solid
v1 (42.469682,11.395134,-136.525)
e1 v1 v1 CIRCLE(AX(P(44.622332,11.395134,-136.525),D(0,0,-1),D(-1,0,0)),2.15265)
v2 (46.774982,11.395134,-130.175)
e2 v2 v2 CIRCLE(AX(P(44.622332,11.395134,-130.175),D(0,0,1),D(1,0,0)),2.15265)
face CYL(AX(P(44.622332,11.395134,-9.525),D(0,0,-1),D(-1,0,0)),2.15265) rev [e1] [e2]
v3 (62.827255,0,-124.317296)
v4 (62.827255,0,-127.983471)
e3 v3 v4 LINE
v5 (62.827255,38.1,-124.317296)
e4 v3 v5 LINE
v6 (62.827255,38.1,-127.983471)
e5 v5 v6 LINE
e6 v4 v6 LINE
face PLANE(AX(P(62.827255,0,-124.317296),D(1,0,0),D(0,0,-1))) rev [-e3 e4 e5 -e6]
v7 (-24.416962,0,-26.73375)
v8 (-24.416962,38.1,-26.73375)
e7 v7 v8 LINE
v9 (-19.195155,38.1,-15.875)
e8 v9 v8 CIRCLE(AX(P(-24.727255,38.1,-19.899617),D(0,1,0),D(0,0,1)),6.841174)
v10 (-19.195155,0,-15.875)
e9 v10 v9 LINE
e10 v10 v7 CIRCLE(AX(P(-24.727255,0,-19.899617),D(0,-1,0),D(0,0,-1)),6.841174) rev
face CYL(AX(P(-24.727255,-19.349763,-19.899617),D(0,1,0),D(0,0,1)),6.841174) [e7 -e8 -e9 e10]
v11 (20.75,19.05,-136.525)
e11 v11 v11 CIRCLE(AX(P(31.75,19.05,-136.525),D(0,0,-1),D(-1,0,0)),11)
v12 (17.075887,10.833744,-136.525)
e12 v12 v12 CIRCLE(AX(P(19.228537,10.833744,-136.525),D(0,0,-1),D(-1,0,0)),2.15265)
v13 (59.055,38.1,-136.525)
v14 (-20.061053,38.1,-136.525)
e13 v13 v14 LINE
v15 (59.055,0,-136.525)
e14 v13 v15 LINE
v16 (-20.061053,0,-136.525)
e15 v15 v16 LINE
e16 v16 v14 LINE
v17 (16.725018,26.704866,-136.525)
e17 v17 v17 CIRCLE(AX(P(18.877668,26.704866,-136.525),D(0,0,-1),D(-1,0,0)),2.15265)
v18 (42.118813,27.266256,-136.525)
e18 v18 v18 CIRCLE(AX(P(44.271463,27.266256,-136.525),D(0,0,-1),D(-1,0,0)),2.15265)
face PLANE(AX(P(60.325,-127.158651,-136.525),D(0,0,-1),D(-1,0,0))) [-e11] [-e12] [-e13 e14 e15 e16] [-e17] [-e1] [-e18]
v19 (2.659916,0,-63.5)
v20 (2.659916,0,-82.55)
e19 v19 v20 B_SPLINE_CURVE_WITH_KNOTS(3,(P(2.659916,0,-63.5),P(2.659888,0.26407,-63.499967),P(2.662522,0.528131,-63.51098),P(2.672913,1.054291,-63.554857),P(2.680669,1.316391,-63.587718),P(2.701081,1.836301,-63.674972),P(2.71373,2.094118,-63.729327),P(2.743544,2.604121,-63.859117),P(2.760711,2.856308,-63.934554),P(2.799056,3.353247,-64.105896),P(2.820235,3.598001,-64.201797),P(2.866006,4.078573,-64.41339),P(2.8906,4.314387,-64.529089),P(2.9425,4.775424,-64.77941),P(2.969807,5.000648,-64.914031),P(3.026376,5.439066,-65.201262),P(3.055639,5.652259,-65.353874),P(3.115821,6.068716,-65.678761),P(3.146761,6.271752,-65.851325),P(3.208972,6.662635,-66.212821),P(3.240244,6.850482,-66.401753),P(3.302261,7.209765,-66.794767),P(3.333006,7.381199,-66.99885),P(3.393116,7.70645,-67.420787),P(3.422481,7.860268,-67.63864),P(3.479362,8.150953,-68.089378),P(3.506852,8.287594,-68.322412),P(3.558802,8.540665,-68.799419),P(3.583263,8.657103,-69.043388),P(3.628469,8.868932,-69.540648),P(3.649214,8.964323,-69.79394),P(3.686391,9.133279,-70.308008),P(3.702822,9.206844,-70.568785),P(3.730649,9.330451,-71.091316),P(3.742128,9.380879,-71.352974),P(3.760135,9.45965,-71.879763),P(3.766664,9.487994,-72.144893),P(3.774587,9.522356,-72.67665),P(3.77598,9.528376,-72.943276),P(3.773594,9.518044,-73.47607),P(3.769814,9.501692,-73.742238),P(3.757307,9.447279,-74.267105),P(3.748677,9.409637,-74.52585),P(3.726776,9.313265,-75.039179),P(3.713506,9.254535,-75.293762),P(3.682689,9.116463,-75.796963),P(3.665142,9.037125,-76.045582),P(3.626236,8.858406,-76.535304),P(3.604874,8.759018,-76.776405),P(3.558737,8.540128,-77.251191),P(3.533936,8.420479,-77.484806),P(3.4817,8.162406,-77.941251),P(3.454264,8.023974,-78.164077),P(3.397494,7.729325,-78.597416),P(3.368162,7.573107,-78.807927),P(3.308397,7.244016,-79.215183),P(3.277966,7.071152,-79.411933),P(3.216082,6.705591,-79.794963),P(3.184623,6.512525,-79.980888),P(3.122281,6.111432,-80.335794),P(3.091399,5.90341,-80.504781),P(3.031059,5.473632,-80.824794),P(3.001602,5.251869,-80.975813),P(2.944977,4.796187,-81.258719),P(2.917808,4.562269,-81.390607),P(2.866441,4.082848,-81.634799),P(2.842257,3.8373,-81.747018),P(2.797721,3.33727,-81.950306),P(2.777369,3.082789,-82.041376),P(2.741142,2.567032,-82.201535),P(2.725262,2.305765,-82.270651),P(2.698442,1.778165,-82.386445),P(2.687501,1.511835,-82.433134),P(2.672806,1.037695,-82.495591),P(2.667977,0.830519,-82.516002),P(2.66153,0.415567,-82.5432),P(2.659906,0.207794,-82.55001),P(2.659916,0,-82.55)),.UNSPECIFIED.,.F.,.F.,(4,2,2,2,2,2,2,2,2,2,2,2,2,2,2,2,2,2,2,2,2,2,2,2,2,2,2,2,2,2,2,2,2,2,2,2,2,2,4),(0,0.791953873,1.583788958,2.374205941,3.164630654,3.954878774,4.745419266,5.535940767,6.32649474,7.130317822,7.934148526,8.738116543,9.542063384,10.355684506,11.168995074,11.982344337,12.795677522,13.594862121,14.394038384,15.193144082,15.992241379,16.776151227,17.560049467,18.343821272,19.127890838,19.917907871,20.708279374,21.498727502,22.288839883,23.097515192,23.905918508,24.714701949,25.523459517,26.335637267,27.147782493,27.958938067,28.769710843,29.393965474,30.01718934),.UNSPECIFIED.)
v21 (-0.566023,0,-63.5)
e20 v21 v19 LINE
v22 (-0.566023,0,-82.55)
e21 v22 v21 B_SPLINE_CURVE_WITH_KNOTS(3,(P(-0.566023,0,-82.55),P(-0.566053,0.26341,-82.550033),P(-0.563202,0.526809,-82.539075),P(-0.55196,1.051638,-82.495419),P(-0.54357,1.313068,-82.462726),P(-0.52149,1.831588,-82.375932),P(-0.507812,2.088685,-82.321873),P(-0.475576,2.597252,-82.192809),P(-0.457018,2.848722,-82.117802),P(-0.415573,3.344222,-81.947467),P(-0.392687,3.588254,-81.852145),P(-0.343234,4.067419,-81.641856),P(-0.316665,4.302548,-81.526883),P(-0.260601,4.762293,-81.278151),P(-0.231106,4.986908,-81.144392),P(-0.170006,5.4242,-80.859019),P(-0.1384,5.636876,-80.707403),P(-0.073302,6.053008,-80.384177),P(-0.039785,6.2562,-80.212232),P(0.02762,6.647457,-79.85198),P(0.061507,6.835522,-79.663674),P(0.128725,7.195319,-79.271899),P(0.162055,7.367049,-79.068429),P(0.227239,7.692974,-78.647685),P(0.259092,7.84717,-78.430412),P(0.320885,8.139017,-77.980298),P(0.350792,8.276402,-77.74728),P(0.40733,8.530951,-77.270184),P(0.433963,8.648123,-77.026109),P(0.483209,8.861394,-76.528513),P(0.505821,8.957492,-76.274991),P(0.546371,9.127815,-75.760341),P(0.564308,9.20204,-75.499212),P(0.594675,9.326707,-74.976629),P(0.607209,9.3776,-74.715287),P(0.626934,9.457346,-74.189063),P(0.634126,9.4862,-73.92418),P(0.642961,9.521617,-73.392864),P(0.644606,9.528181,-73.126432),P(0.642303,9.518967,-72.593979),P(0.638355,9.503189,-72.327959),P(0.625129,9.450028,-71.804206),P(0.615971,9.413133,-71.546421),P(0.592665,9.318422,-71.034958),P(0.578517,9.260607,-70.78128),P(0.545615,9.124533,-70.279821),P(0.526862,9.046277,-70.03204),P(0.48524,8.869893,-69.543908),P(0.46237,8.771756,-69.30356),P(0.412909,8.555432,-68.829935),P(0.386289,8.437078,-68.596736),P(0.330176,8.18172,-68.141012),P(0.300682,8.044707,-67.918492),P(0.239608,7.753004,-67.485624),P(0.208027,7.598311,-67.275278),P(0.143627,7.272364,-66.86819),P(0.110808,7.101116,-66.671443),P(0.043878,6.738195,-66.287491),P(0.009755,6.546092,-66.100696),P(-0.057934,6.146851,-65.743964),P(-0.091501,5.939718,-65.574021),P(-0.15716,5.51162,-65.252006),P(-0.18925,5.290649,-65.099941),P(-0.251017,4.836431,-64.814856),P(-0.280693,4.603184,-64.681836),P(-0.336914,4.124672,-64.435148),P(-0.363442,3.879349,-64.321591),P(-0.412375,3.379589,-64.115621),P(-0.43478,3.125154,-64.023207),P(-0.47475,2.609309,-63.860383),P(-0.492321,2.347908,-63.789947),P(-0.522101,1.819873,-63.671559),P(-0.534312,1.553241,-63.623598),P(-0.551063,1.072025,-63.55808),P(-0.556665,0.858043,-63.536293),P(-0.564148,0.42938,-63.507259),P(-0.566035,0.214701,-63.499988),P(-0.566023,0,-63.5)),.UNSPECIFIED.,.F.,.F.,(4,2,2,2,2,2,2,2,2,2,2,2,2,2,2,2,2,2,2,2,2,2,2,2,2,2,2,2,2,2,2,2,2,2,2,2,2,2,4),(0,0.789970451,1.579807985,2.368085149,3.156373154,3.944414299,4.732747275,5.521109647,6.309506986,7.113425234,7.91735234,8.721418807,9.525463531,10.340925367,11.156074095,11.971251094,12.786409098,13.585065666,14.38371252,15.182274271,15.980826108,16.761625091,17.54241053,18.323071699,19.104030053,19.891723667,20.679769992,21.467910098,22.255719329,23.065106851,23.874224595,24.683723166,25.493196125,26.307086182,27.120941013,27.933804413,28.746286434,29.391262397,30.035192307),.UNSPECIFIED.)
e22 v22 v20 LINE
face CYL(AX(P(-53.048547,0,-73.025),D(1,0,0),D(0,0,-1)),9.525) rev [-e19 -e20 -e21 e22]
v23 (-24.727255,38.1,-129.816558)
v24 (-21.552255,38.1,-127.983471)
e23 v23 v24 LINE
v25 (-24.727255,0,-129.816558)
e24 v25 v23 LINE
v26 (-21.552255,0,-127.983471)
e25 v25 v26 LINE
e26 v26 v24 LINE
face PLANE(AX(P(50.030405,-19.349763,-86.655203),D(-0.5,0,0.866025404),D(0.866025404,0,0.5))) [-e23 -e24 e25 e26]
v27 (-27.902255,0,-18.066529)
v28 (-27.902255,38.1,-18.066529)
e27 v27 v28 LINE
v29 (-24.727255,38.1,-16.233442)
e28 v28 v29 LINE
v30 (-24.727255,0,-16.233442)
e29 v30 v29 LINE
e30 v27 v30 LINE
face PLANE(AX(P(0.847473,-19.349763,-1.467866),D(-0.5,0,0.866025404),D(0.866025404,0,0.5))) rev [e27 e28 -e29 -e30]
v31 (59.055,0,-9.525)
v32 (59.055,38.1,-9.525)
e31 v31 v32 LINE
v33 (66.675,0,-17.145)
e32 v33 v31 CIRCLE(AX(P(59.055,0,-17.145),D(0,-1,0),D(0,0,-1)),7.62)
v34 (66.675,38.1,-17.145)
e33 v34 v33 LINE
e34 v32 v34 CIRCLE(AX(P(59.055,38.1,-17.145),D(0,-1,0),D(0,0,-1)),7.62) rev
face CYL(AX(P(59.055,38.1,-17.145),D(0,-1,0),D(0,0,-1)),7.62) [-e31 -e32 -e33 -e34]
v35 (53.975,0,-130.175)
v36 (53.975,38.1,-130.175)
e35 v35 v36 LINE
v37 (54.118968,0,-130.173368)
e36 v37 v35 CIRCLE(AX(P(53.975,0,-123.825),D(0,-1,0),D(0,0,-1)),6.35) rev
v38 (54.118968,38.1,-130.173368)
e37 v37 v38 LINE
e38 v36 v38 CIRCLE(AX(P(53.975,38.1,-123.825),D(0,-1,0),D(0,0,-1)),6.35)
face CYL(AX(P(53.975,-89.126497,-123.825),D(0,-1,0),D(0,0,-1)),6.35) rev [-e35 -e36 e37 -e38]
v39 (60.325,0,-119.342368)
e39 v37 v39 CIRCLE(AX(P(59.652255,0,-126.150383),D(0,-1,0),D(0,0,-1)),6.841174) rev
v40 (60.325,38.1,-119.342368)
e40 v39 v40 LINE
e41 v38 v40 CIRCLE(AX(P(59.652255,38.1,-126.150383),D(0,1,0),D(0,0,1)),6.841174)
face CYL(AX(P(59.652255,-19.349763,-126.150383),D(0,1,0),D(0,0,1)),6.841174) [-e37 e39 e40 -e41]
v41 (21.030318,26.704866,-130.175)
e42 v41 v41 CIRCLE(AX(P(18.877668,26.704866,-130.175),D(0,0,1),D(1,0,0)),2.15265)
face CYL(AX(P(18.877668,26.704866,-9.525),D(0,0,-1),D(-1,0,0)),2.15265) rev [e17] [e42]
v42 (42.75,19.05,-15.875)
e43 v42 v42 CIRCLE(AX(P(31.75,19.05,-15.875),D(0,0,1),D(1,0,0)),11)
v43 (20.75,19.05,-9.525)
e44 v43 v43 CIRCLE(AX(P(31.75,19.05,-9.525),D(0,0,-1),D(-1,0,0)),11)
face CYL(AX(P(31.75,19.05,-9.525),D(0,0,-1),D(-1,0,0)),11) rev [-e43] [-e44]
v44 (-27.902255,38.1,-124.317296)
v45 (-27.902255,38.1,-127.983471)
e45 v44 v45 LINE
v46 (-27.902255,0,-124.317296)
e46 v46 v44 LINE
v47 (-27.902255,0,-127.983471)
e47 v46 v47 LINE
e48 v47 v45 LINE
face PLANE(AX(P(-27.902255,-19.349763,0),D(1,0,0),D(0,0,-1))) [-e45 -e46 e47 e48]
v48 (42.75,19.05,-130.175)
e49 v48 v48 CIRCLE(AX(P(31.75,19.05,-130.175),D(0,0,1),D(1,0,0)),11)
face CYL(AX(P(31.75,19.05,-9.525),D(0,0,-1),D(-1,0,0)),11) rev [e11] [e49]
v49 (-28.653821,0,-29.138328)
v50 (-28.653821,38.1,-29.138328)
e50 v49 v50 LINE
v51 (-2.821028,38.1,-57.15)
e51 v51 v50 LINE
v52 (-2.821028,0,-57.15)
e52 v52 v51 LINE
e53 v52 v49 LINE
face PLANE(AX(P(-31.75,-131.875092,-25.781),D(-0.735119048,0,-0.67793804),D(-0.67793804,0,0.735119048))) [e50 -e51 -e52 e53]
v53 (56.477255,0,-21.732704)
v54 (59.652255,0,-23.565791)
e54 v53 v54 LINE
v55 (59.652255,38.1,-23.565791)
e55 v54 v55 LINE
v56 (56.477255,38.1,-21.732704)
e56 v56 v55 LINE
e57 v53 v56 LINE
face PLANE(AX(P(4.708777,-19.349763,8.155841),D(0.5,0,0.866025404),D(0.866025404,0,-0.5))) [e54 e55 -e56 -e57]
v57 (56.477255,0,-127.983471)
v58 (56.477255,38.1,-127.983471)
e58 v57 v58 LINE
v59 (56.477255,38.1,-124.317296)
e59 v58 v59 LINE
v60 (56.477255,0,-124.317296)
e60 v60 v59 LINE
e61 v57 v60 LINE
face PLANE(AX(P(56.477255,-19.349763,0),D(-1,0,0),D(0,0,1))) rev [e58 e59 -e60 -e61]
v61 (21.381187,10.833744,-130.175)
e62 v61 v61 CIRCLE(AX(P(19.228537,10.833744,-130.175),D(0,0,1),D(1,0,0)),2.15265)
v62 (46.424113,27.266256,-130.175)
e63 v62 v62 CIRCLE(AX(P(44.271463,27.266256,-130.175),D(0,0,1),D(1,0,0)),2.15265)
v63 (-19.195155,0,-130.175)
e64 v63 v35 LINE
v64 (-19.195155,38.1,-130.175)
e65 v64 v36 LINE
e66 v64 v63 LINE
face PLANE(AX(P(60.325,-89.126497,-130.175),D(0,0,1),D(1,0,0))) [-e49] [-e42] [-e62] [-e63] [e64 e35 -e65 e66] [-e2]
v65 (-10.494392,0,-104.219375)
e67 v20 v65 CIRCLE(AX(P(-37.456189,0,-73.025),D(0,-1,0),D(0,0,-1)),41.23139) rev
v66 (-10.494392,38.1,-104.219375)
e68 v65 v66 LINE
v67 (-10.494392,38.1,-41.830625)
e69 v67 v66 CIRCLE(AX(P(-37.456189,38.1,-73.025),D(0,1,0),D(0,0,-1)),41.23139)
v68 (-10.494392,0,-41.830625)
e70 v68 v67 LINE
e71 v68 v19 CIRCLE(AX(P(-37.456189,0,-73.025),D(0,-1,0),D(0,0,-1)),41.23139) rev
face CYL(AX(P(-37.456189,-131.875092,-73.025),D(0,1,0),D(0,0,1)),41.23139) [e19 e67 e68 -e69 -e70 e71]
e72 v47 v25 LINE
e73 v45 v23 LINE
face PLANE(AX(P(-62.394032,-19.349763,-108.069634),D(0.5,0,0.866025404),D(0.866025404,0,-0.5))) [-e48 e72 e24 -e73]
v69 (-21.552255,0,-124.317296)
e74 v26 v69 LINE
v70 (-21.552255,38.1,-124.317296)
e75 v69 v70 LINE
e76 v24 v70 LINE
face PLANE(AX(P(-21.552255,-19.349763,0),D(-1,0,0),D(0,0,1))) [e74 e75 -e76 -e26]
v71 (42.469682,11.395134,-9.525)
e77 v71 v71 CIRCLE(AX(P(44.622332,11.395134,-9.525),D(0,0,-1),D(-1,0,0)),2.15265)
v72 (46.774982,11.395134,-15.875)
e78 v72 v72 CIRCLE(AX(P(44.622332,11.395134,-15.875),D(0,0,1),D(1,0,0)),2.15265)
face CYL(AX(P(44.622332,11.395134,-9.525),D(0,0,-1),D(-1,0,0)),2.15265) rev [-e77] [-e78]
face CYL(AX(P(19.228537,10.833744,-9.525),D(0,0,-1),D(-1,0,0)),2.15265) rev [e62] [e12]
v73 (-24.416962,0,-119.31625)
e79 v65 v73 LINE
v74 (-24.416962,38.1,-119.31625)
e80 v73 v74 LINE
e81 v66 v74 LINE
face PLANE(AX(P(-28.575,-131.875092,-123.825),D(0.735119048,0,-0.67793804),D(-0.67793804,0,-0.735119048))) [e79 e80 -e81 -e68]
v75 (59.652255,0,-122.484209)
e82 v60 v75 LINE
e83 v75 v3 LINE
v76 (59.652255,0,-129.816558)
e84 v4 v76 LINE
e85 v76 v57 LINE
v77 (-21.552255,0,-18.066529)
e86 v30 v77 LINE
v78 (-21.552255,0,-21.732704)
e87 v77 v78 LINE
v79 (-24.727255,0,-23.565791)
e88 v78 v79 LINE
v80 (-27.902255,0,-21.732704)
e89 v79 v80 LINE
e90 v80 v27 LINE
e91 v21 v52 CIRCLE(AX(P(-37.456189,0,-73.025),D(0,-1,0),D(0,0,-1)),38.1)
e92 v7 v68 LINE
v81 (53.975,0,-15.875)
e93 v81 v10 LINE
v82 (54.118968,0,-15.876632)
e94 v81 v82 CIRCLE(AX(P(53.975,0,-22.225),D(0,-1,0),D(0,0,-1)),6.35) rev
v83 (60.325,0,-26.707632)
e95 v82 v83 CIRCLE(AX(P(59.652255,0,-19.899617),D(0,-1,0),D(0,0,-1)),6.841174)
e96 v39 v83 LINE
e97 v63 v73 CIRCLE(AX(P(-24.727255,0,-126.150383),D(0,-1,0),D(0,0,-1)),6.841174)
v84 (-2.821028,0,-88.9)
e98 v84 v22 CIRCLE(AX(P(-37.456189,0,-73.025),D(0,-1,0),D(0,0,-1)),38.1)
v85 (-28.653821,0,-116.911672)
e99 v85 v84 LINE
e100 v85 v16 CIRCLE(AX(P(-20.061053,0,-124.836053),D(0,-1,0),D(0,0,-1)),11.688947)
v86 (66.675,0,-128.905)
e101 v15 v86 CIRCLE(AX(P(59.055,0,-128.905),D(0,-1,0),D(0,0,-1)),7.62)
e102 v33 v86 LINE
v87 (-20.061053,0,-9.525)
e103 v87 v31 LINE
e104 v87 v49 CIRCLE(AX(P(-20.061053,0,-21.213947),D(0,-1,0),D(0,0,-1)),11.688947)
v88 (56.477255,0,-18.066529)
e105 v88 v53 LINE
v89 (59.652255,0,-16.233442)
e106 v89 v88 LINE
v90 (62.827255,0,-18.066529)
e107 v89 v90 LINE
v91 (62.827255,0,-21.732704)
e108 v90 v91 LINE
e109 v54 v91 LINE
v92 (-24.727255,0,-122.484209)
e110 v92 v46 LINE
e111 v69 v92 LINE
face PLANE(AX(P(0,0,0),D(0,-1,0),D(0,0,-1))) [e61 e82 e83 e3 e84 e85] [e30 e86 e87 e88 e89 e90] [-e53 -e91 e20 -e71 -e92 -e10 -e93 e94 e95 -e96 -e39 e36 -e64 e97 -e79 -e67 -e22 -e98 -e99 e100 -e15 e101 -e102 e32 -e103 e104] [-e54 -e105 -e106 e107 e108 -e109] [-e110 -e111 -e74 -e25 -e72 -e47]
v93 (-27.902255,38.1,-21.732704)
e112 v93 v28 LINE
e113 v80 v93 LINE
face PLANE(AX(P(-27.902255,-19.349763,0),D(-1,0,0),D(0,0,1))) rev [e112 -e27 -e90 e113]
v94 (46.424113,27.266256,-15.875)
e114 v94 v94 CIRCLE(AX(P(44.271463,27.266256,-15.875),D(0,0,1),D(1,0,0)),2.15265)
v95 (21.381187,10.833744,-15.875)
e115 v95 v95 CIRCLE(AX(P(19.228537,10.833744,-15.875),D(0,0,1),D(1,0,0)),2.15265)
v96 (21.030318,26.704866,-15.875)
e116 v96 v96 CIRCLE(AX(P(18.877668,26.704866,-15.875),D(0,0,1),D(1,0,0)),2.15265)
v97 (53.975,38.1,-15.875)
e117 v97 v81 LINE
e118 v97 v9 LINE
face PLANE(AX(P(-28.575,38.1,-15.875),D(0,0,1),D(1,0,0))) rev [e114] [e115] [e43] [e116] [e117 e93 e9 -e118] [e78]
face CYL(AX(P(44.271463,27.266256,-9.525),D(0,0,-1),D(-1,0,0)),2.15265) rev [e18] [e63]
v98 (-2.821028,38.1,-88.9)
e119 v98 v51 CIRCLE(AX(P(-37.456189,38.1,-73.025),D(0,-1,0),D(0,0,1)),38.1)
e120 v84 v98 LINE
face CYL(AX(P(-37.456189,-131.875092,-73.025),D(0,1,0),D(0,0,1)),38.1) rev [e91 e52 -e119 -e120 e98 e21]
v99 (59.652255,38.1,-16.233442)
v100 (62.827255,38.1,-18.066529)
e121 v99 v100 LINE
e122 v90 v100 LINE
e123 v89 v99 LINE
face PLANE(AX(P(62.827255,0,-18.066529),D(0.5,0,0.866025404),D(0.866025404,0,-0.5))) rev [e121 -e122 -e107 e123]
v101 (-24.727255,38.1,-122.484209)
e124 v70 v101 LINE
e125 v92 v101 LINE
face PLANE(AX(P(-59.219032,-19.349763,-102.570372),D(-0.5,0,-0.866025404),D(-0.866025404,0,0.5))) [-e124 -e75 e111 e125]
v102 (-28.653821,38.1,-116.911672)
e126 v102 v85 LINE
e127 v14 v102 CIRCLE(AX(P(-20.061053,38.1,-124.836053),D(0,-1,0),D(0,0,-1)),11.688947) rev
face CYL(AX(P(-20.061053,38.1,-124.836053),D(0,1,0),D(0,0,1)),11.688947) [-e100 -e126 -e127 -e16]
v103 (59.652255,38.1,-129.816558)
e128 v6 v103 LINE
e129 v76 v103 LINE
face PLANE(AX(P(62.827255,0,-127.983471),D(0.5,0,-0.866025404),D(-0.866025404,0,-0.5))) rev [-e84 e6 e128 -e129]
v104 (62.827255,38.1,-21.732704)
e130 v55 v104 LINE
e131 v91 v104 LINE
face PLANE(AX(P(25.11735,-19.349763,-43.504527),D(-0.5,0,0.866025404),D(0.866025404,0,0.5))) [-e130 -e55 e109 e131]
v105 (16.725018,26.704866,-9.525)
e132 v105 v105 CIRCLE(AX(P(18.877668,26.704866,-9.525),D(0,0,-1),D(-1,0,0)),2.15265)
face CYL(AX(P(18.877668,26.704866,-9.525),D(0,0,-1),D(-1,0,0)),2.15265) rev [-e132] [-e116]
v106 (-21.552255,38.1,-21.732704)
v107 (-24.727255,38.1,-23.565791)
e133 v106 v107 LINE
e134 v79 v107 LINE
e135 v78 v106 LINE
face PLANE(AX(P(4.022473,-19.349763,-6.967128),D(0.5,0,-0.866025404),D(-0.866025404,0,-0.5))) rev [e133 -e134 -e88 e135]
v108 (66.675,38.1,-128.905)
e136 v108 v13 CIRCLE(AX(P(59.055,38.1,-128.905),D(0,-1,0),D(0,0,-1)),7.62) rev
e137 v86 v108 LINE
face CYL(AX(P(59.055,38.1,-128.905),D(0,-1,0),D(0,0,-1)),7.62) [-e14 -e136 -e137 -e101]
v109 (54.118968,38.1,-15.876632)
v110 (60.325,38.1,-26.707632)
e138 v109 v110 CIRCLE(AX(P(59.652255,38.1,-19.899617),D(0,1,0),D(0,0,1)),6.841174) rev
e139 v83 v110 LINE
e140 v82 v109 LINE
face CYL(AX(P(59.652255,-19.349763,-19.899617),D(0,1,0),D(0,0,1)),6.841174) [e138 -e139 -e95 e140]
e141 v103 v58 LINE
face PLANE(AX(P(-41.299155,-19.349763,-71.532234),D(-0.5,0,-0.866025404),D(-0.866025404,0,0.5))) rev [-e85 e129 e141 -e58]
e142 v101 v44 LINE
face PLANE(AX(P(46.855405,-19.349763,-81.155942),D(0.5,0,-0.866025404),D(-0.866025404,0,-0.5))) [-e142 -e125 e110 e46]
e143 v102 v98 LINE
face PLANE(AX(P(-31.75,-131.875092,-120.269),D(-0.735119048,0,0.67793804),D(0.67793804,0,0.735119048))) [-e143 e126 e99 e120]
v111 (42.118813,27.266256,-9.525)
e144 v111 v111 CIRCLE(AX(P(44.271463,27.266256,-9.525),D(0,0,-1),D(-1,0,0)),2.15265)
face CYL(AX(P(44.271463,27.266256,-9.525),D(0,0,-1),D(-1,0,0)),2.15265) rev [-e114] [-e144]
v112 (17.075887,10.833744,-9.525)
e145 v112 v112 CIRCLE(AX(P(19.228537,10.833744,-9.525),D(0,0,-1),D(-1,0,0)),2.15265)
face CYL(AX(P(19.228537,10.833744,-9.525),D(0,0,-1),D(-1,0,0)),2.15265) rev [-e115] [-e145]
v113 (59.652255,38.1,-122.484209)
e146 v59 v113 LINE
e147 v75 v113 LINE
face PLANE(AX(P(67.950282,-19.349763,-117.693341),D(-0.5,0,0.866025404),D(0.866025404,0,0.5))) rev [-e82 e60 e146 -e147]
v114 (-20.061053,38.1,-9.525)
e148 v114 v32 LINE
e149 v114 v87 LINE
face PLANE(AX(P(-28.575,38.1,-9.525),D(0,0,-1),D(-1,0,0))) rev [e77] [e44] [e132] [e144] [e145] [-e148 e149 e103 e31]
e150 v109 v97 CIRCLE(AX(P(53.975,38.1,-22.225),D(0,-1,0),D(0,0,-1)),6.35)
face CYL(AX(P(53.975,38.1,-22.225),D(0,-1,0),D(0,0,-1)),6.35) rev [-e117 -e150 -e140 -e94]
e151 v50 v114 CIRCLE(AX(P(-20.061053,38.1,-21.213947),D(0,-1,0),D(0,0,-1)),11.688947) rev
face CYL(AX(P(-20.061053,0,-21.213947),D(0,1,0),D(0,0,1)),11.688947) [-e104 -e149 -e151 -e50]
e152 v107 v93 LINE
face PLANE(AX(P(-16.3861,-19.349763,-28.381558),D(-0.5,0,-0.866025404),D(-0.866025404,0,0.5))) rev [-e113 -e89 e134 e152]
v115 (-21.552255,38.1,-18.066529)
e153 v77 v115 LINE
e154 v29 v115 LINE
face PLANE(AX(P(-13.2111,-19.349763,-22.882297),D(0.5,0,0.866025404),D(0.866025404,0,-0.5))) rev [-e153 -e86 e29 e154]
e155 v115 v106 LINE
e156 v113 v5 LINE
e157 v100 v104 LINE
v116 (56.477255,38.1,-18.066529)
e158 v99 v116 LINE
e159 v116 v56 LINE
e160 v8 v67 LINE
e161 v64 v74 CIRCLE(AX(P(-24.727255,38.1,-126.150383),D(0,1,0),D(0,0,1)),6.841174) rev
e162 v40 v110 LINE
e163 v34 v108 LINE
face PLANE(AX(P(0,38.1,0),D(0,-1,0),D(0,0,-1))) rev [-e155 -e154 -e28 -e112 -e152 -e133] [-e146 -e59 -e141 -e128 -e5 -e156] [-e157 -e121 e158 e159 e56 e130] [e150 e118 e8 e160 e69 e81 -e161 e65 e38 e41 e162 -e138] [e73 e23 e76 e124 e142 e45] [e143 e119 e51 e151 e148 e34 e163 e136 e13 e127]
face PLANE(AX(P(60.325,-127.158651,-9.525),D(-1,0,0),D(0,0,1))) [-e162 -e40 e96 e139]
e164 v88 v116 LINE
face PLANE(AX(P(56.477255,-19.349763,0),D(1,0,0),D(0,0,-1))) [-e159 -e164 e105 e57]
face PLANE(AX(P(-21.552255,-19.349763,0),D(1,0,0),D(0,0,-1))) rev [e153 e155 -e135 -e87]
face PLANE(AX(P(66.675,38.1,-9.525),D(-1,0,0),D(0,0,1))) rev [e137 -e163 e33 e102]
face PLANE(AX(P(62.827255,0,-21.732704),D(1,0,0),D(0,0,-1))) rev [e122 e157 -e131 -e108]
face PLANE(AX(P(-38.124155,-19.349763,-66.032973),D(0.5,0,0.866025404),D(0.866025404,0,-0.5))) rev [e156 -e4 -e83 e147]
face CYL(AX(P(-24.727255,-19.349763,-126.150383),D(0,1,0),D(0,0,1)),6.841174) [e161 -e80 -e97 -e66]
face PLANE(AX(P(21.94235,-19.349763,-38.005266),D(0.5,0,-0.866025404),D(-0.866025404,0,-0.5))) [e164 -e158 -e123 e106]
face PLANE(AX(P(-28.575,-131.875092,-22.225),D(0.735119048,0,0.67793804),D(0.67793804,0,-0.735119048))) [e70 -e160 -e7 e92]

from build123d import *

# Parameters (mm, degrees)
SKETCH1_W               = 95.25
SKETCH1_H               = 6.35
BOSS_EXTRUDE1_DEPTH     = 38.1
SKETCH2_W               = 6.35
SKETCH2_H               = 127
BOSS_EXTRUDE2_DEPTH     = 38.1
SKETCH3_W               = 88.9
SKETCH3_H               = 6.35
BOSS_EXTRUDE3_DEPTH     = 38.1
SKETCH4_R               = 11
CUT_EXTRUDE1_DEPTH      = 149.412147835
SKETCH5_R               = 2.15265
CUT_EXTRUDE2_DEPTH      = 149.412147835
FILLET1_R               = 7.62
BOSS_EXTRUDE4_DEPTH     = 38.1
CUT_EXTRUDE8_REACH      = 171.022
CUT_EXTRUDE8_END_RADIUS = 38.1
FILLET2_R               = 11.688947
FILLET3_R               = 11.688947
FILLET4_R               = 6.35
SKETCH15_R              = 6.841174209
BOSS_EXTRUDE7_DEPTH     = 38.1
CUT_EXTRUDE12_DEPTH     = 157.640484095


with BuildPart() as part:
    # Sketch1 → Boss-Extrude1 (new body)
    with BuildSketch(Plane(origin=(0, 0, 0), x_dir=(1, 0, 0), z_dir=(0, 1, 0))):
        with Locations((19.05, 12.7)):
            Rectangle(SKETCH1_W, SKETCH1_H)
    extrude(amount=BOSS_EXTRUDE1_DEPTH)

    # Sketch2 → Boss-Extrude2 (add)
    with BuildSketch(Plane(origin=(0, 38.1, 0), x_dir=(1, 0, 0), z_dir=(0, 1, 0))):
        with Locations((63.5, 73.025)):
            Rectangle(SKETCH2_W, SKETCH2_H)
    extrude(amount=-BOSS_EXTRUDE2_DEPTH)

    # Sketch3 → Boss-Extrude3 (add)
    with BuildSketch(Plane(origin=(0, 38.1, 0), x_dir=(1, 0, 0), z_dir=(0, 1, 0))):
        with Locations((15.875, 133.35)):
            Rectangle(SKETCH3_W, SKETCH3_H)
    extrude(amount=-BOSS_EXTRUDE3_DEPTH)

    # Sketch4 → Cut-Extrude1 (cut, through all)
    with BuildSketch(Plane(origin=(0, 0, -136.525), x_dir=(-1, 0, 0), z_dir=(0, 0, -1))):
        with Locations((-31.75, 19.05)):
            Circle(SKETCH4_R)
    extrude(amount=-CUT_EXTRUDE1_DEPTH, mode=Mode.SUBTRACT)

    # Sketch5 → Cut-Extrude2 (cut, through all)
    with BuildSketch(Plane(origin=(0, 0, -136.525), x_dir=(-1, 0, 0), z_dir=(0, 0, -1))):
        with Locations((-18.877667779, 26.704865736)):
            Circle(SKETCH5_R)
        with Locations((-19.228536904, 10.833743663)):
            Circle(SKETCH5_R)
        with Locations((-44.622332221, 11.395134264)):
            Circle(SKETCH5_R)
        with Locations((-44.271463096, 27.266256337)):
            Circle(SKETCH5_R)
    extrude(amount=-CUT_EXTRUDE2_DEPTH, mode=Mode.SUBTRACT)

    # Fillet1
    fillet1_edges = [part.edges().sort_by_distance(p)[0] for p in [
        (66.675, 19.05, -136.525),
        (66.675, 19.05, -9.525),
    ]]
    fillet(fillet1_edges, radius=FILLET1_R)

    # Sketch10 → Boss-Extrude4 (add)
    with BuildSketch(Plane(origin=(0, 38.1, 0), x_dir=(1, 0, 0), z_dir=(0, 1, 0))):
        with BuildLine():
            Line((-28.575, 15.875), (-28.575, 9.525))
            Line((-28.575, 9.525), (-31.75, 9.525))
            Line((-31.75, 9.525), (-31.75, 25.781))
            Line((-31.75, 25.781), (-2.821027965, 57.15))
            ThreePointArc((-2.821027965, 57.15), (0.643811071, 73.025), (-2.821027965, 88.9))
            Line((-2.821027965, 88.9), (-31.75, 120.269))
            Line((-31.75, 120.269), (-31.75, 136.525))
            Line((-31.75, 136.525), (-28.575, 136.525))
            Line((-28.575, 136.525), (-28.575, 123.825))
            Line((-28.575, 123.825), (-10.494392478, 104.219375))
            ThreePointArc((-10.494392478, 104.219375), (3.775200806, 73.025), (-10.494392478, 41.830625))
            Line((-10.494392478, 41.830625), (-28.575, 22.225))
            Line((-28.575, 22.225), (-28.575, 15.875))
        make_face()
    extrude(amount=-BOSS_EXTRUDE4_DEPTH)

    # Cut-Extrude8: up to this cylinder (the profile starts outside it)
    cut_extrude8_end = Plane(origin=(-37.456188929, 4.042536, -73.025), z_dir=(0, 1, 0)) * Cylinder(CUT_EXTRUDE8_END_RADIUS, 419.244, mode=Mode.PRIVATE)
    # Sketch12 → Cut-Extrude8 (cut, up to the surface)
    with BuildSketch(Plane.ZY.offset(-60.325), mode=Mode.PRIVATE) as cut_extrude8_sk1:
        with BuildLine():
            Line((-82.55, 0), (-63.5, 0))
            ThreePointArc((-63.5, 0), (-73.025, 9.525), (-82.55, 0))
        make_face()
    cut_extrude8_tool1 = extrude(cut_extrude8_sk1.sketch, amount=CUT_EXTRUDE8_REACH, mode=Mode.PRIVATE) - cut_extrude8_end
    add(cut_extrude8_tool1.solids().sort_by_distance((60.325, 4.042536, -73.025))[0], mode=Mode.SUBTRACT)

    # Fillet2
    fillet2_edges = [part.edges().sort_by_distance(p)[0] for p in [
        (-31.75, 19.05, -136.525),
        (-31.75, 19.05, -120.269),
    ]]
    fillet(fillet2_edges, radius=FILLET2_R - 0.0001)  # a hair under: the kernel refuses the full size

    # Fillet3
    fillet3_edges = [part.edges().sort_by_distance(p)[0] for p in [
        (-31.75, 19.05, -25.781),
        (-31.75, 19.05, -9.525),
    ]]
    fillet(fillet3_edges, radius=FILLET3_R - 0.0001)  # a hair under: the kernel refuses the full size

    # Fillet4
    fillet4_edges = [part.edges().sort_by_distance(p)[0] for p in [
        (60.325, 19.05, -15.875),
        (60.325, 19.05, -130.175),
    ]]
    fillet(fillet4_edges, radius=FILLET4_R)

    # Sketch15 → Boss-Extrude7 (add)
    # profile 1 of 4: a face of its own
    with BuildSketch(Plane(origin=(0, 38.1, 0), x_dir=(1, 0, 0), z_dir=(0, 1, 0))):
        with Locations((59.652254611, 126.150383493)):
            Circle(SKETCH15_R)
        Polygon((59.652254611, 129.816557703), (56.477254611, 127.983470598), (56.477254611, 124.317296388), (59.652254611, 122.484209284), (62.827254611, 124.317296388), (62.827254611, 127.983470598), align=None, mode=Mode.SUBTRACT)
    # profile 2 of 4: a face of its own
    with BuildSketch(Plane(origin=(0, 38.1, 0), x_dir=(1, 0, 0), z_dir=(0, 1, 0))):
        with Locations((-24.727254611, 19.899616507)):
            Circle(SKETCH15_R)
        Polygon((-21.552254611, 21.732703612), (-24.727254611, 23.565790716), (-27.902254611, 21.732703612), (-27.902254611, 18.066529402), (-24.727254611, 16.233442297), (-21.552254611, 18.066529402), align=None, mode=Mode.SUBTRACT)
    # profile 3 of 4: a face of its own
    with BuildSketch(Plane(origin=(0, 38.1, 0), x_dir=(1, 0, 0), z_dir=(0, 1, 0))):
        with Locations((-24.727254611, 126.150383493)):
            Circle(SKETCH15_R)
        Polygon((-21.552254611, 127.983470598), (-21.552254611, 124.317296388), (-24.727254611, 122.484209284), (-27.902254611, 124.317296388), (-27.902254611, 127.983470598), (-24.727254611, 129.816557703), align=None, mode=Mode.SUBTRACT)
    # profile 4 of 4: a face of its own
    with BuildSketch(Plane(origin=(0, 38.1, 0), x_dir=(1, 0, 0), z_dir=(0, 1, 0))):
        with Locations((59.652254611, 19.899616507)):
            Circle(SKETCH15_R)
        Polygon((56.477254611, 18.066529402), (56.477254611, 21.732703612), (59.652254611, 23.565790716), (62.827254611, 21.732703612), (62.827254611, 18.066529402), (59.652254611, 16.233442297), align=None, mode=Mode.SUBTRACT)
    extrude(amount=-BOSS_EXTRUDE7_DEPTH)

    # Sketch21 → Cut-Extrude12 (cut, through all)
    with BuildSketch(Plane(origin=(0, 38.1, 0), x_dir=(1, 0, 0), z_dir=(0, 1, 0))):
        Polygon((-21.552254611, 21.732703612), (-24.727254611, 23.565790716), (-27.902254611, 21.732703612), (-27.902254611, 18.066529402), (-24.727254611, 16.233442297), (-21.552254611, 18.066529402), align=None)
        Polygon((56.477254611, 18.066529402), (56.477254611, 21.732703612), (59.652254611, 23.565790716), (62.827254611, 21.732703612), (62.827254611, 18.066529402), (59.652254611, 16.233442297), align=None)
        Polygon((59.652254611, 129.816557703), (56.477254611, 127.983470598), (56.477254611, 124.317296388), (59.652254611, 122.484209284), (62.827254611, 124.317296388), (62.827254611, 127.983470598), align=None)
        Polygon((-21.552254611, 127.983470598), (-21.552254611, 124.317296388), (-24.727254611, 122.484209284), (-27.902254611, 124.317296388), (-27.902254611, 127.983470598), (-24.727254611, 129.816557703), align=None)
    extrude(amount=-CUT_EXTRUDE12_DEPTH, mode=Mode.SUBTRACT)


solid = part.part
